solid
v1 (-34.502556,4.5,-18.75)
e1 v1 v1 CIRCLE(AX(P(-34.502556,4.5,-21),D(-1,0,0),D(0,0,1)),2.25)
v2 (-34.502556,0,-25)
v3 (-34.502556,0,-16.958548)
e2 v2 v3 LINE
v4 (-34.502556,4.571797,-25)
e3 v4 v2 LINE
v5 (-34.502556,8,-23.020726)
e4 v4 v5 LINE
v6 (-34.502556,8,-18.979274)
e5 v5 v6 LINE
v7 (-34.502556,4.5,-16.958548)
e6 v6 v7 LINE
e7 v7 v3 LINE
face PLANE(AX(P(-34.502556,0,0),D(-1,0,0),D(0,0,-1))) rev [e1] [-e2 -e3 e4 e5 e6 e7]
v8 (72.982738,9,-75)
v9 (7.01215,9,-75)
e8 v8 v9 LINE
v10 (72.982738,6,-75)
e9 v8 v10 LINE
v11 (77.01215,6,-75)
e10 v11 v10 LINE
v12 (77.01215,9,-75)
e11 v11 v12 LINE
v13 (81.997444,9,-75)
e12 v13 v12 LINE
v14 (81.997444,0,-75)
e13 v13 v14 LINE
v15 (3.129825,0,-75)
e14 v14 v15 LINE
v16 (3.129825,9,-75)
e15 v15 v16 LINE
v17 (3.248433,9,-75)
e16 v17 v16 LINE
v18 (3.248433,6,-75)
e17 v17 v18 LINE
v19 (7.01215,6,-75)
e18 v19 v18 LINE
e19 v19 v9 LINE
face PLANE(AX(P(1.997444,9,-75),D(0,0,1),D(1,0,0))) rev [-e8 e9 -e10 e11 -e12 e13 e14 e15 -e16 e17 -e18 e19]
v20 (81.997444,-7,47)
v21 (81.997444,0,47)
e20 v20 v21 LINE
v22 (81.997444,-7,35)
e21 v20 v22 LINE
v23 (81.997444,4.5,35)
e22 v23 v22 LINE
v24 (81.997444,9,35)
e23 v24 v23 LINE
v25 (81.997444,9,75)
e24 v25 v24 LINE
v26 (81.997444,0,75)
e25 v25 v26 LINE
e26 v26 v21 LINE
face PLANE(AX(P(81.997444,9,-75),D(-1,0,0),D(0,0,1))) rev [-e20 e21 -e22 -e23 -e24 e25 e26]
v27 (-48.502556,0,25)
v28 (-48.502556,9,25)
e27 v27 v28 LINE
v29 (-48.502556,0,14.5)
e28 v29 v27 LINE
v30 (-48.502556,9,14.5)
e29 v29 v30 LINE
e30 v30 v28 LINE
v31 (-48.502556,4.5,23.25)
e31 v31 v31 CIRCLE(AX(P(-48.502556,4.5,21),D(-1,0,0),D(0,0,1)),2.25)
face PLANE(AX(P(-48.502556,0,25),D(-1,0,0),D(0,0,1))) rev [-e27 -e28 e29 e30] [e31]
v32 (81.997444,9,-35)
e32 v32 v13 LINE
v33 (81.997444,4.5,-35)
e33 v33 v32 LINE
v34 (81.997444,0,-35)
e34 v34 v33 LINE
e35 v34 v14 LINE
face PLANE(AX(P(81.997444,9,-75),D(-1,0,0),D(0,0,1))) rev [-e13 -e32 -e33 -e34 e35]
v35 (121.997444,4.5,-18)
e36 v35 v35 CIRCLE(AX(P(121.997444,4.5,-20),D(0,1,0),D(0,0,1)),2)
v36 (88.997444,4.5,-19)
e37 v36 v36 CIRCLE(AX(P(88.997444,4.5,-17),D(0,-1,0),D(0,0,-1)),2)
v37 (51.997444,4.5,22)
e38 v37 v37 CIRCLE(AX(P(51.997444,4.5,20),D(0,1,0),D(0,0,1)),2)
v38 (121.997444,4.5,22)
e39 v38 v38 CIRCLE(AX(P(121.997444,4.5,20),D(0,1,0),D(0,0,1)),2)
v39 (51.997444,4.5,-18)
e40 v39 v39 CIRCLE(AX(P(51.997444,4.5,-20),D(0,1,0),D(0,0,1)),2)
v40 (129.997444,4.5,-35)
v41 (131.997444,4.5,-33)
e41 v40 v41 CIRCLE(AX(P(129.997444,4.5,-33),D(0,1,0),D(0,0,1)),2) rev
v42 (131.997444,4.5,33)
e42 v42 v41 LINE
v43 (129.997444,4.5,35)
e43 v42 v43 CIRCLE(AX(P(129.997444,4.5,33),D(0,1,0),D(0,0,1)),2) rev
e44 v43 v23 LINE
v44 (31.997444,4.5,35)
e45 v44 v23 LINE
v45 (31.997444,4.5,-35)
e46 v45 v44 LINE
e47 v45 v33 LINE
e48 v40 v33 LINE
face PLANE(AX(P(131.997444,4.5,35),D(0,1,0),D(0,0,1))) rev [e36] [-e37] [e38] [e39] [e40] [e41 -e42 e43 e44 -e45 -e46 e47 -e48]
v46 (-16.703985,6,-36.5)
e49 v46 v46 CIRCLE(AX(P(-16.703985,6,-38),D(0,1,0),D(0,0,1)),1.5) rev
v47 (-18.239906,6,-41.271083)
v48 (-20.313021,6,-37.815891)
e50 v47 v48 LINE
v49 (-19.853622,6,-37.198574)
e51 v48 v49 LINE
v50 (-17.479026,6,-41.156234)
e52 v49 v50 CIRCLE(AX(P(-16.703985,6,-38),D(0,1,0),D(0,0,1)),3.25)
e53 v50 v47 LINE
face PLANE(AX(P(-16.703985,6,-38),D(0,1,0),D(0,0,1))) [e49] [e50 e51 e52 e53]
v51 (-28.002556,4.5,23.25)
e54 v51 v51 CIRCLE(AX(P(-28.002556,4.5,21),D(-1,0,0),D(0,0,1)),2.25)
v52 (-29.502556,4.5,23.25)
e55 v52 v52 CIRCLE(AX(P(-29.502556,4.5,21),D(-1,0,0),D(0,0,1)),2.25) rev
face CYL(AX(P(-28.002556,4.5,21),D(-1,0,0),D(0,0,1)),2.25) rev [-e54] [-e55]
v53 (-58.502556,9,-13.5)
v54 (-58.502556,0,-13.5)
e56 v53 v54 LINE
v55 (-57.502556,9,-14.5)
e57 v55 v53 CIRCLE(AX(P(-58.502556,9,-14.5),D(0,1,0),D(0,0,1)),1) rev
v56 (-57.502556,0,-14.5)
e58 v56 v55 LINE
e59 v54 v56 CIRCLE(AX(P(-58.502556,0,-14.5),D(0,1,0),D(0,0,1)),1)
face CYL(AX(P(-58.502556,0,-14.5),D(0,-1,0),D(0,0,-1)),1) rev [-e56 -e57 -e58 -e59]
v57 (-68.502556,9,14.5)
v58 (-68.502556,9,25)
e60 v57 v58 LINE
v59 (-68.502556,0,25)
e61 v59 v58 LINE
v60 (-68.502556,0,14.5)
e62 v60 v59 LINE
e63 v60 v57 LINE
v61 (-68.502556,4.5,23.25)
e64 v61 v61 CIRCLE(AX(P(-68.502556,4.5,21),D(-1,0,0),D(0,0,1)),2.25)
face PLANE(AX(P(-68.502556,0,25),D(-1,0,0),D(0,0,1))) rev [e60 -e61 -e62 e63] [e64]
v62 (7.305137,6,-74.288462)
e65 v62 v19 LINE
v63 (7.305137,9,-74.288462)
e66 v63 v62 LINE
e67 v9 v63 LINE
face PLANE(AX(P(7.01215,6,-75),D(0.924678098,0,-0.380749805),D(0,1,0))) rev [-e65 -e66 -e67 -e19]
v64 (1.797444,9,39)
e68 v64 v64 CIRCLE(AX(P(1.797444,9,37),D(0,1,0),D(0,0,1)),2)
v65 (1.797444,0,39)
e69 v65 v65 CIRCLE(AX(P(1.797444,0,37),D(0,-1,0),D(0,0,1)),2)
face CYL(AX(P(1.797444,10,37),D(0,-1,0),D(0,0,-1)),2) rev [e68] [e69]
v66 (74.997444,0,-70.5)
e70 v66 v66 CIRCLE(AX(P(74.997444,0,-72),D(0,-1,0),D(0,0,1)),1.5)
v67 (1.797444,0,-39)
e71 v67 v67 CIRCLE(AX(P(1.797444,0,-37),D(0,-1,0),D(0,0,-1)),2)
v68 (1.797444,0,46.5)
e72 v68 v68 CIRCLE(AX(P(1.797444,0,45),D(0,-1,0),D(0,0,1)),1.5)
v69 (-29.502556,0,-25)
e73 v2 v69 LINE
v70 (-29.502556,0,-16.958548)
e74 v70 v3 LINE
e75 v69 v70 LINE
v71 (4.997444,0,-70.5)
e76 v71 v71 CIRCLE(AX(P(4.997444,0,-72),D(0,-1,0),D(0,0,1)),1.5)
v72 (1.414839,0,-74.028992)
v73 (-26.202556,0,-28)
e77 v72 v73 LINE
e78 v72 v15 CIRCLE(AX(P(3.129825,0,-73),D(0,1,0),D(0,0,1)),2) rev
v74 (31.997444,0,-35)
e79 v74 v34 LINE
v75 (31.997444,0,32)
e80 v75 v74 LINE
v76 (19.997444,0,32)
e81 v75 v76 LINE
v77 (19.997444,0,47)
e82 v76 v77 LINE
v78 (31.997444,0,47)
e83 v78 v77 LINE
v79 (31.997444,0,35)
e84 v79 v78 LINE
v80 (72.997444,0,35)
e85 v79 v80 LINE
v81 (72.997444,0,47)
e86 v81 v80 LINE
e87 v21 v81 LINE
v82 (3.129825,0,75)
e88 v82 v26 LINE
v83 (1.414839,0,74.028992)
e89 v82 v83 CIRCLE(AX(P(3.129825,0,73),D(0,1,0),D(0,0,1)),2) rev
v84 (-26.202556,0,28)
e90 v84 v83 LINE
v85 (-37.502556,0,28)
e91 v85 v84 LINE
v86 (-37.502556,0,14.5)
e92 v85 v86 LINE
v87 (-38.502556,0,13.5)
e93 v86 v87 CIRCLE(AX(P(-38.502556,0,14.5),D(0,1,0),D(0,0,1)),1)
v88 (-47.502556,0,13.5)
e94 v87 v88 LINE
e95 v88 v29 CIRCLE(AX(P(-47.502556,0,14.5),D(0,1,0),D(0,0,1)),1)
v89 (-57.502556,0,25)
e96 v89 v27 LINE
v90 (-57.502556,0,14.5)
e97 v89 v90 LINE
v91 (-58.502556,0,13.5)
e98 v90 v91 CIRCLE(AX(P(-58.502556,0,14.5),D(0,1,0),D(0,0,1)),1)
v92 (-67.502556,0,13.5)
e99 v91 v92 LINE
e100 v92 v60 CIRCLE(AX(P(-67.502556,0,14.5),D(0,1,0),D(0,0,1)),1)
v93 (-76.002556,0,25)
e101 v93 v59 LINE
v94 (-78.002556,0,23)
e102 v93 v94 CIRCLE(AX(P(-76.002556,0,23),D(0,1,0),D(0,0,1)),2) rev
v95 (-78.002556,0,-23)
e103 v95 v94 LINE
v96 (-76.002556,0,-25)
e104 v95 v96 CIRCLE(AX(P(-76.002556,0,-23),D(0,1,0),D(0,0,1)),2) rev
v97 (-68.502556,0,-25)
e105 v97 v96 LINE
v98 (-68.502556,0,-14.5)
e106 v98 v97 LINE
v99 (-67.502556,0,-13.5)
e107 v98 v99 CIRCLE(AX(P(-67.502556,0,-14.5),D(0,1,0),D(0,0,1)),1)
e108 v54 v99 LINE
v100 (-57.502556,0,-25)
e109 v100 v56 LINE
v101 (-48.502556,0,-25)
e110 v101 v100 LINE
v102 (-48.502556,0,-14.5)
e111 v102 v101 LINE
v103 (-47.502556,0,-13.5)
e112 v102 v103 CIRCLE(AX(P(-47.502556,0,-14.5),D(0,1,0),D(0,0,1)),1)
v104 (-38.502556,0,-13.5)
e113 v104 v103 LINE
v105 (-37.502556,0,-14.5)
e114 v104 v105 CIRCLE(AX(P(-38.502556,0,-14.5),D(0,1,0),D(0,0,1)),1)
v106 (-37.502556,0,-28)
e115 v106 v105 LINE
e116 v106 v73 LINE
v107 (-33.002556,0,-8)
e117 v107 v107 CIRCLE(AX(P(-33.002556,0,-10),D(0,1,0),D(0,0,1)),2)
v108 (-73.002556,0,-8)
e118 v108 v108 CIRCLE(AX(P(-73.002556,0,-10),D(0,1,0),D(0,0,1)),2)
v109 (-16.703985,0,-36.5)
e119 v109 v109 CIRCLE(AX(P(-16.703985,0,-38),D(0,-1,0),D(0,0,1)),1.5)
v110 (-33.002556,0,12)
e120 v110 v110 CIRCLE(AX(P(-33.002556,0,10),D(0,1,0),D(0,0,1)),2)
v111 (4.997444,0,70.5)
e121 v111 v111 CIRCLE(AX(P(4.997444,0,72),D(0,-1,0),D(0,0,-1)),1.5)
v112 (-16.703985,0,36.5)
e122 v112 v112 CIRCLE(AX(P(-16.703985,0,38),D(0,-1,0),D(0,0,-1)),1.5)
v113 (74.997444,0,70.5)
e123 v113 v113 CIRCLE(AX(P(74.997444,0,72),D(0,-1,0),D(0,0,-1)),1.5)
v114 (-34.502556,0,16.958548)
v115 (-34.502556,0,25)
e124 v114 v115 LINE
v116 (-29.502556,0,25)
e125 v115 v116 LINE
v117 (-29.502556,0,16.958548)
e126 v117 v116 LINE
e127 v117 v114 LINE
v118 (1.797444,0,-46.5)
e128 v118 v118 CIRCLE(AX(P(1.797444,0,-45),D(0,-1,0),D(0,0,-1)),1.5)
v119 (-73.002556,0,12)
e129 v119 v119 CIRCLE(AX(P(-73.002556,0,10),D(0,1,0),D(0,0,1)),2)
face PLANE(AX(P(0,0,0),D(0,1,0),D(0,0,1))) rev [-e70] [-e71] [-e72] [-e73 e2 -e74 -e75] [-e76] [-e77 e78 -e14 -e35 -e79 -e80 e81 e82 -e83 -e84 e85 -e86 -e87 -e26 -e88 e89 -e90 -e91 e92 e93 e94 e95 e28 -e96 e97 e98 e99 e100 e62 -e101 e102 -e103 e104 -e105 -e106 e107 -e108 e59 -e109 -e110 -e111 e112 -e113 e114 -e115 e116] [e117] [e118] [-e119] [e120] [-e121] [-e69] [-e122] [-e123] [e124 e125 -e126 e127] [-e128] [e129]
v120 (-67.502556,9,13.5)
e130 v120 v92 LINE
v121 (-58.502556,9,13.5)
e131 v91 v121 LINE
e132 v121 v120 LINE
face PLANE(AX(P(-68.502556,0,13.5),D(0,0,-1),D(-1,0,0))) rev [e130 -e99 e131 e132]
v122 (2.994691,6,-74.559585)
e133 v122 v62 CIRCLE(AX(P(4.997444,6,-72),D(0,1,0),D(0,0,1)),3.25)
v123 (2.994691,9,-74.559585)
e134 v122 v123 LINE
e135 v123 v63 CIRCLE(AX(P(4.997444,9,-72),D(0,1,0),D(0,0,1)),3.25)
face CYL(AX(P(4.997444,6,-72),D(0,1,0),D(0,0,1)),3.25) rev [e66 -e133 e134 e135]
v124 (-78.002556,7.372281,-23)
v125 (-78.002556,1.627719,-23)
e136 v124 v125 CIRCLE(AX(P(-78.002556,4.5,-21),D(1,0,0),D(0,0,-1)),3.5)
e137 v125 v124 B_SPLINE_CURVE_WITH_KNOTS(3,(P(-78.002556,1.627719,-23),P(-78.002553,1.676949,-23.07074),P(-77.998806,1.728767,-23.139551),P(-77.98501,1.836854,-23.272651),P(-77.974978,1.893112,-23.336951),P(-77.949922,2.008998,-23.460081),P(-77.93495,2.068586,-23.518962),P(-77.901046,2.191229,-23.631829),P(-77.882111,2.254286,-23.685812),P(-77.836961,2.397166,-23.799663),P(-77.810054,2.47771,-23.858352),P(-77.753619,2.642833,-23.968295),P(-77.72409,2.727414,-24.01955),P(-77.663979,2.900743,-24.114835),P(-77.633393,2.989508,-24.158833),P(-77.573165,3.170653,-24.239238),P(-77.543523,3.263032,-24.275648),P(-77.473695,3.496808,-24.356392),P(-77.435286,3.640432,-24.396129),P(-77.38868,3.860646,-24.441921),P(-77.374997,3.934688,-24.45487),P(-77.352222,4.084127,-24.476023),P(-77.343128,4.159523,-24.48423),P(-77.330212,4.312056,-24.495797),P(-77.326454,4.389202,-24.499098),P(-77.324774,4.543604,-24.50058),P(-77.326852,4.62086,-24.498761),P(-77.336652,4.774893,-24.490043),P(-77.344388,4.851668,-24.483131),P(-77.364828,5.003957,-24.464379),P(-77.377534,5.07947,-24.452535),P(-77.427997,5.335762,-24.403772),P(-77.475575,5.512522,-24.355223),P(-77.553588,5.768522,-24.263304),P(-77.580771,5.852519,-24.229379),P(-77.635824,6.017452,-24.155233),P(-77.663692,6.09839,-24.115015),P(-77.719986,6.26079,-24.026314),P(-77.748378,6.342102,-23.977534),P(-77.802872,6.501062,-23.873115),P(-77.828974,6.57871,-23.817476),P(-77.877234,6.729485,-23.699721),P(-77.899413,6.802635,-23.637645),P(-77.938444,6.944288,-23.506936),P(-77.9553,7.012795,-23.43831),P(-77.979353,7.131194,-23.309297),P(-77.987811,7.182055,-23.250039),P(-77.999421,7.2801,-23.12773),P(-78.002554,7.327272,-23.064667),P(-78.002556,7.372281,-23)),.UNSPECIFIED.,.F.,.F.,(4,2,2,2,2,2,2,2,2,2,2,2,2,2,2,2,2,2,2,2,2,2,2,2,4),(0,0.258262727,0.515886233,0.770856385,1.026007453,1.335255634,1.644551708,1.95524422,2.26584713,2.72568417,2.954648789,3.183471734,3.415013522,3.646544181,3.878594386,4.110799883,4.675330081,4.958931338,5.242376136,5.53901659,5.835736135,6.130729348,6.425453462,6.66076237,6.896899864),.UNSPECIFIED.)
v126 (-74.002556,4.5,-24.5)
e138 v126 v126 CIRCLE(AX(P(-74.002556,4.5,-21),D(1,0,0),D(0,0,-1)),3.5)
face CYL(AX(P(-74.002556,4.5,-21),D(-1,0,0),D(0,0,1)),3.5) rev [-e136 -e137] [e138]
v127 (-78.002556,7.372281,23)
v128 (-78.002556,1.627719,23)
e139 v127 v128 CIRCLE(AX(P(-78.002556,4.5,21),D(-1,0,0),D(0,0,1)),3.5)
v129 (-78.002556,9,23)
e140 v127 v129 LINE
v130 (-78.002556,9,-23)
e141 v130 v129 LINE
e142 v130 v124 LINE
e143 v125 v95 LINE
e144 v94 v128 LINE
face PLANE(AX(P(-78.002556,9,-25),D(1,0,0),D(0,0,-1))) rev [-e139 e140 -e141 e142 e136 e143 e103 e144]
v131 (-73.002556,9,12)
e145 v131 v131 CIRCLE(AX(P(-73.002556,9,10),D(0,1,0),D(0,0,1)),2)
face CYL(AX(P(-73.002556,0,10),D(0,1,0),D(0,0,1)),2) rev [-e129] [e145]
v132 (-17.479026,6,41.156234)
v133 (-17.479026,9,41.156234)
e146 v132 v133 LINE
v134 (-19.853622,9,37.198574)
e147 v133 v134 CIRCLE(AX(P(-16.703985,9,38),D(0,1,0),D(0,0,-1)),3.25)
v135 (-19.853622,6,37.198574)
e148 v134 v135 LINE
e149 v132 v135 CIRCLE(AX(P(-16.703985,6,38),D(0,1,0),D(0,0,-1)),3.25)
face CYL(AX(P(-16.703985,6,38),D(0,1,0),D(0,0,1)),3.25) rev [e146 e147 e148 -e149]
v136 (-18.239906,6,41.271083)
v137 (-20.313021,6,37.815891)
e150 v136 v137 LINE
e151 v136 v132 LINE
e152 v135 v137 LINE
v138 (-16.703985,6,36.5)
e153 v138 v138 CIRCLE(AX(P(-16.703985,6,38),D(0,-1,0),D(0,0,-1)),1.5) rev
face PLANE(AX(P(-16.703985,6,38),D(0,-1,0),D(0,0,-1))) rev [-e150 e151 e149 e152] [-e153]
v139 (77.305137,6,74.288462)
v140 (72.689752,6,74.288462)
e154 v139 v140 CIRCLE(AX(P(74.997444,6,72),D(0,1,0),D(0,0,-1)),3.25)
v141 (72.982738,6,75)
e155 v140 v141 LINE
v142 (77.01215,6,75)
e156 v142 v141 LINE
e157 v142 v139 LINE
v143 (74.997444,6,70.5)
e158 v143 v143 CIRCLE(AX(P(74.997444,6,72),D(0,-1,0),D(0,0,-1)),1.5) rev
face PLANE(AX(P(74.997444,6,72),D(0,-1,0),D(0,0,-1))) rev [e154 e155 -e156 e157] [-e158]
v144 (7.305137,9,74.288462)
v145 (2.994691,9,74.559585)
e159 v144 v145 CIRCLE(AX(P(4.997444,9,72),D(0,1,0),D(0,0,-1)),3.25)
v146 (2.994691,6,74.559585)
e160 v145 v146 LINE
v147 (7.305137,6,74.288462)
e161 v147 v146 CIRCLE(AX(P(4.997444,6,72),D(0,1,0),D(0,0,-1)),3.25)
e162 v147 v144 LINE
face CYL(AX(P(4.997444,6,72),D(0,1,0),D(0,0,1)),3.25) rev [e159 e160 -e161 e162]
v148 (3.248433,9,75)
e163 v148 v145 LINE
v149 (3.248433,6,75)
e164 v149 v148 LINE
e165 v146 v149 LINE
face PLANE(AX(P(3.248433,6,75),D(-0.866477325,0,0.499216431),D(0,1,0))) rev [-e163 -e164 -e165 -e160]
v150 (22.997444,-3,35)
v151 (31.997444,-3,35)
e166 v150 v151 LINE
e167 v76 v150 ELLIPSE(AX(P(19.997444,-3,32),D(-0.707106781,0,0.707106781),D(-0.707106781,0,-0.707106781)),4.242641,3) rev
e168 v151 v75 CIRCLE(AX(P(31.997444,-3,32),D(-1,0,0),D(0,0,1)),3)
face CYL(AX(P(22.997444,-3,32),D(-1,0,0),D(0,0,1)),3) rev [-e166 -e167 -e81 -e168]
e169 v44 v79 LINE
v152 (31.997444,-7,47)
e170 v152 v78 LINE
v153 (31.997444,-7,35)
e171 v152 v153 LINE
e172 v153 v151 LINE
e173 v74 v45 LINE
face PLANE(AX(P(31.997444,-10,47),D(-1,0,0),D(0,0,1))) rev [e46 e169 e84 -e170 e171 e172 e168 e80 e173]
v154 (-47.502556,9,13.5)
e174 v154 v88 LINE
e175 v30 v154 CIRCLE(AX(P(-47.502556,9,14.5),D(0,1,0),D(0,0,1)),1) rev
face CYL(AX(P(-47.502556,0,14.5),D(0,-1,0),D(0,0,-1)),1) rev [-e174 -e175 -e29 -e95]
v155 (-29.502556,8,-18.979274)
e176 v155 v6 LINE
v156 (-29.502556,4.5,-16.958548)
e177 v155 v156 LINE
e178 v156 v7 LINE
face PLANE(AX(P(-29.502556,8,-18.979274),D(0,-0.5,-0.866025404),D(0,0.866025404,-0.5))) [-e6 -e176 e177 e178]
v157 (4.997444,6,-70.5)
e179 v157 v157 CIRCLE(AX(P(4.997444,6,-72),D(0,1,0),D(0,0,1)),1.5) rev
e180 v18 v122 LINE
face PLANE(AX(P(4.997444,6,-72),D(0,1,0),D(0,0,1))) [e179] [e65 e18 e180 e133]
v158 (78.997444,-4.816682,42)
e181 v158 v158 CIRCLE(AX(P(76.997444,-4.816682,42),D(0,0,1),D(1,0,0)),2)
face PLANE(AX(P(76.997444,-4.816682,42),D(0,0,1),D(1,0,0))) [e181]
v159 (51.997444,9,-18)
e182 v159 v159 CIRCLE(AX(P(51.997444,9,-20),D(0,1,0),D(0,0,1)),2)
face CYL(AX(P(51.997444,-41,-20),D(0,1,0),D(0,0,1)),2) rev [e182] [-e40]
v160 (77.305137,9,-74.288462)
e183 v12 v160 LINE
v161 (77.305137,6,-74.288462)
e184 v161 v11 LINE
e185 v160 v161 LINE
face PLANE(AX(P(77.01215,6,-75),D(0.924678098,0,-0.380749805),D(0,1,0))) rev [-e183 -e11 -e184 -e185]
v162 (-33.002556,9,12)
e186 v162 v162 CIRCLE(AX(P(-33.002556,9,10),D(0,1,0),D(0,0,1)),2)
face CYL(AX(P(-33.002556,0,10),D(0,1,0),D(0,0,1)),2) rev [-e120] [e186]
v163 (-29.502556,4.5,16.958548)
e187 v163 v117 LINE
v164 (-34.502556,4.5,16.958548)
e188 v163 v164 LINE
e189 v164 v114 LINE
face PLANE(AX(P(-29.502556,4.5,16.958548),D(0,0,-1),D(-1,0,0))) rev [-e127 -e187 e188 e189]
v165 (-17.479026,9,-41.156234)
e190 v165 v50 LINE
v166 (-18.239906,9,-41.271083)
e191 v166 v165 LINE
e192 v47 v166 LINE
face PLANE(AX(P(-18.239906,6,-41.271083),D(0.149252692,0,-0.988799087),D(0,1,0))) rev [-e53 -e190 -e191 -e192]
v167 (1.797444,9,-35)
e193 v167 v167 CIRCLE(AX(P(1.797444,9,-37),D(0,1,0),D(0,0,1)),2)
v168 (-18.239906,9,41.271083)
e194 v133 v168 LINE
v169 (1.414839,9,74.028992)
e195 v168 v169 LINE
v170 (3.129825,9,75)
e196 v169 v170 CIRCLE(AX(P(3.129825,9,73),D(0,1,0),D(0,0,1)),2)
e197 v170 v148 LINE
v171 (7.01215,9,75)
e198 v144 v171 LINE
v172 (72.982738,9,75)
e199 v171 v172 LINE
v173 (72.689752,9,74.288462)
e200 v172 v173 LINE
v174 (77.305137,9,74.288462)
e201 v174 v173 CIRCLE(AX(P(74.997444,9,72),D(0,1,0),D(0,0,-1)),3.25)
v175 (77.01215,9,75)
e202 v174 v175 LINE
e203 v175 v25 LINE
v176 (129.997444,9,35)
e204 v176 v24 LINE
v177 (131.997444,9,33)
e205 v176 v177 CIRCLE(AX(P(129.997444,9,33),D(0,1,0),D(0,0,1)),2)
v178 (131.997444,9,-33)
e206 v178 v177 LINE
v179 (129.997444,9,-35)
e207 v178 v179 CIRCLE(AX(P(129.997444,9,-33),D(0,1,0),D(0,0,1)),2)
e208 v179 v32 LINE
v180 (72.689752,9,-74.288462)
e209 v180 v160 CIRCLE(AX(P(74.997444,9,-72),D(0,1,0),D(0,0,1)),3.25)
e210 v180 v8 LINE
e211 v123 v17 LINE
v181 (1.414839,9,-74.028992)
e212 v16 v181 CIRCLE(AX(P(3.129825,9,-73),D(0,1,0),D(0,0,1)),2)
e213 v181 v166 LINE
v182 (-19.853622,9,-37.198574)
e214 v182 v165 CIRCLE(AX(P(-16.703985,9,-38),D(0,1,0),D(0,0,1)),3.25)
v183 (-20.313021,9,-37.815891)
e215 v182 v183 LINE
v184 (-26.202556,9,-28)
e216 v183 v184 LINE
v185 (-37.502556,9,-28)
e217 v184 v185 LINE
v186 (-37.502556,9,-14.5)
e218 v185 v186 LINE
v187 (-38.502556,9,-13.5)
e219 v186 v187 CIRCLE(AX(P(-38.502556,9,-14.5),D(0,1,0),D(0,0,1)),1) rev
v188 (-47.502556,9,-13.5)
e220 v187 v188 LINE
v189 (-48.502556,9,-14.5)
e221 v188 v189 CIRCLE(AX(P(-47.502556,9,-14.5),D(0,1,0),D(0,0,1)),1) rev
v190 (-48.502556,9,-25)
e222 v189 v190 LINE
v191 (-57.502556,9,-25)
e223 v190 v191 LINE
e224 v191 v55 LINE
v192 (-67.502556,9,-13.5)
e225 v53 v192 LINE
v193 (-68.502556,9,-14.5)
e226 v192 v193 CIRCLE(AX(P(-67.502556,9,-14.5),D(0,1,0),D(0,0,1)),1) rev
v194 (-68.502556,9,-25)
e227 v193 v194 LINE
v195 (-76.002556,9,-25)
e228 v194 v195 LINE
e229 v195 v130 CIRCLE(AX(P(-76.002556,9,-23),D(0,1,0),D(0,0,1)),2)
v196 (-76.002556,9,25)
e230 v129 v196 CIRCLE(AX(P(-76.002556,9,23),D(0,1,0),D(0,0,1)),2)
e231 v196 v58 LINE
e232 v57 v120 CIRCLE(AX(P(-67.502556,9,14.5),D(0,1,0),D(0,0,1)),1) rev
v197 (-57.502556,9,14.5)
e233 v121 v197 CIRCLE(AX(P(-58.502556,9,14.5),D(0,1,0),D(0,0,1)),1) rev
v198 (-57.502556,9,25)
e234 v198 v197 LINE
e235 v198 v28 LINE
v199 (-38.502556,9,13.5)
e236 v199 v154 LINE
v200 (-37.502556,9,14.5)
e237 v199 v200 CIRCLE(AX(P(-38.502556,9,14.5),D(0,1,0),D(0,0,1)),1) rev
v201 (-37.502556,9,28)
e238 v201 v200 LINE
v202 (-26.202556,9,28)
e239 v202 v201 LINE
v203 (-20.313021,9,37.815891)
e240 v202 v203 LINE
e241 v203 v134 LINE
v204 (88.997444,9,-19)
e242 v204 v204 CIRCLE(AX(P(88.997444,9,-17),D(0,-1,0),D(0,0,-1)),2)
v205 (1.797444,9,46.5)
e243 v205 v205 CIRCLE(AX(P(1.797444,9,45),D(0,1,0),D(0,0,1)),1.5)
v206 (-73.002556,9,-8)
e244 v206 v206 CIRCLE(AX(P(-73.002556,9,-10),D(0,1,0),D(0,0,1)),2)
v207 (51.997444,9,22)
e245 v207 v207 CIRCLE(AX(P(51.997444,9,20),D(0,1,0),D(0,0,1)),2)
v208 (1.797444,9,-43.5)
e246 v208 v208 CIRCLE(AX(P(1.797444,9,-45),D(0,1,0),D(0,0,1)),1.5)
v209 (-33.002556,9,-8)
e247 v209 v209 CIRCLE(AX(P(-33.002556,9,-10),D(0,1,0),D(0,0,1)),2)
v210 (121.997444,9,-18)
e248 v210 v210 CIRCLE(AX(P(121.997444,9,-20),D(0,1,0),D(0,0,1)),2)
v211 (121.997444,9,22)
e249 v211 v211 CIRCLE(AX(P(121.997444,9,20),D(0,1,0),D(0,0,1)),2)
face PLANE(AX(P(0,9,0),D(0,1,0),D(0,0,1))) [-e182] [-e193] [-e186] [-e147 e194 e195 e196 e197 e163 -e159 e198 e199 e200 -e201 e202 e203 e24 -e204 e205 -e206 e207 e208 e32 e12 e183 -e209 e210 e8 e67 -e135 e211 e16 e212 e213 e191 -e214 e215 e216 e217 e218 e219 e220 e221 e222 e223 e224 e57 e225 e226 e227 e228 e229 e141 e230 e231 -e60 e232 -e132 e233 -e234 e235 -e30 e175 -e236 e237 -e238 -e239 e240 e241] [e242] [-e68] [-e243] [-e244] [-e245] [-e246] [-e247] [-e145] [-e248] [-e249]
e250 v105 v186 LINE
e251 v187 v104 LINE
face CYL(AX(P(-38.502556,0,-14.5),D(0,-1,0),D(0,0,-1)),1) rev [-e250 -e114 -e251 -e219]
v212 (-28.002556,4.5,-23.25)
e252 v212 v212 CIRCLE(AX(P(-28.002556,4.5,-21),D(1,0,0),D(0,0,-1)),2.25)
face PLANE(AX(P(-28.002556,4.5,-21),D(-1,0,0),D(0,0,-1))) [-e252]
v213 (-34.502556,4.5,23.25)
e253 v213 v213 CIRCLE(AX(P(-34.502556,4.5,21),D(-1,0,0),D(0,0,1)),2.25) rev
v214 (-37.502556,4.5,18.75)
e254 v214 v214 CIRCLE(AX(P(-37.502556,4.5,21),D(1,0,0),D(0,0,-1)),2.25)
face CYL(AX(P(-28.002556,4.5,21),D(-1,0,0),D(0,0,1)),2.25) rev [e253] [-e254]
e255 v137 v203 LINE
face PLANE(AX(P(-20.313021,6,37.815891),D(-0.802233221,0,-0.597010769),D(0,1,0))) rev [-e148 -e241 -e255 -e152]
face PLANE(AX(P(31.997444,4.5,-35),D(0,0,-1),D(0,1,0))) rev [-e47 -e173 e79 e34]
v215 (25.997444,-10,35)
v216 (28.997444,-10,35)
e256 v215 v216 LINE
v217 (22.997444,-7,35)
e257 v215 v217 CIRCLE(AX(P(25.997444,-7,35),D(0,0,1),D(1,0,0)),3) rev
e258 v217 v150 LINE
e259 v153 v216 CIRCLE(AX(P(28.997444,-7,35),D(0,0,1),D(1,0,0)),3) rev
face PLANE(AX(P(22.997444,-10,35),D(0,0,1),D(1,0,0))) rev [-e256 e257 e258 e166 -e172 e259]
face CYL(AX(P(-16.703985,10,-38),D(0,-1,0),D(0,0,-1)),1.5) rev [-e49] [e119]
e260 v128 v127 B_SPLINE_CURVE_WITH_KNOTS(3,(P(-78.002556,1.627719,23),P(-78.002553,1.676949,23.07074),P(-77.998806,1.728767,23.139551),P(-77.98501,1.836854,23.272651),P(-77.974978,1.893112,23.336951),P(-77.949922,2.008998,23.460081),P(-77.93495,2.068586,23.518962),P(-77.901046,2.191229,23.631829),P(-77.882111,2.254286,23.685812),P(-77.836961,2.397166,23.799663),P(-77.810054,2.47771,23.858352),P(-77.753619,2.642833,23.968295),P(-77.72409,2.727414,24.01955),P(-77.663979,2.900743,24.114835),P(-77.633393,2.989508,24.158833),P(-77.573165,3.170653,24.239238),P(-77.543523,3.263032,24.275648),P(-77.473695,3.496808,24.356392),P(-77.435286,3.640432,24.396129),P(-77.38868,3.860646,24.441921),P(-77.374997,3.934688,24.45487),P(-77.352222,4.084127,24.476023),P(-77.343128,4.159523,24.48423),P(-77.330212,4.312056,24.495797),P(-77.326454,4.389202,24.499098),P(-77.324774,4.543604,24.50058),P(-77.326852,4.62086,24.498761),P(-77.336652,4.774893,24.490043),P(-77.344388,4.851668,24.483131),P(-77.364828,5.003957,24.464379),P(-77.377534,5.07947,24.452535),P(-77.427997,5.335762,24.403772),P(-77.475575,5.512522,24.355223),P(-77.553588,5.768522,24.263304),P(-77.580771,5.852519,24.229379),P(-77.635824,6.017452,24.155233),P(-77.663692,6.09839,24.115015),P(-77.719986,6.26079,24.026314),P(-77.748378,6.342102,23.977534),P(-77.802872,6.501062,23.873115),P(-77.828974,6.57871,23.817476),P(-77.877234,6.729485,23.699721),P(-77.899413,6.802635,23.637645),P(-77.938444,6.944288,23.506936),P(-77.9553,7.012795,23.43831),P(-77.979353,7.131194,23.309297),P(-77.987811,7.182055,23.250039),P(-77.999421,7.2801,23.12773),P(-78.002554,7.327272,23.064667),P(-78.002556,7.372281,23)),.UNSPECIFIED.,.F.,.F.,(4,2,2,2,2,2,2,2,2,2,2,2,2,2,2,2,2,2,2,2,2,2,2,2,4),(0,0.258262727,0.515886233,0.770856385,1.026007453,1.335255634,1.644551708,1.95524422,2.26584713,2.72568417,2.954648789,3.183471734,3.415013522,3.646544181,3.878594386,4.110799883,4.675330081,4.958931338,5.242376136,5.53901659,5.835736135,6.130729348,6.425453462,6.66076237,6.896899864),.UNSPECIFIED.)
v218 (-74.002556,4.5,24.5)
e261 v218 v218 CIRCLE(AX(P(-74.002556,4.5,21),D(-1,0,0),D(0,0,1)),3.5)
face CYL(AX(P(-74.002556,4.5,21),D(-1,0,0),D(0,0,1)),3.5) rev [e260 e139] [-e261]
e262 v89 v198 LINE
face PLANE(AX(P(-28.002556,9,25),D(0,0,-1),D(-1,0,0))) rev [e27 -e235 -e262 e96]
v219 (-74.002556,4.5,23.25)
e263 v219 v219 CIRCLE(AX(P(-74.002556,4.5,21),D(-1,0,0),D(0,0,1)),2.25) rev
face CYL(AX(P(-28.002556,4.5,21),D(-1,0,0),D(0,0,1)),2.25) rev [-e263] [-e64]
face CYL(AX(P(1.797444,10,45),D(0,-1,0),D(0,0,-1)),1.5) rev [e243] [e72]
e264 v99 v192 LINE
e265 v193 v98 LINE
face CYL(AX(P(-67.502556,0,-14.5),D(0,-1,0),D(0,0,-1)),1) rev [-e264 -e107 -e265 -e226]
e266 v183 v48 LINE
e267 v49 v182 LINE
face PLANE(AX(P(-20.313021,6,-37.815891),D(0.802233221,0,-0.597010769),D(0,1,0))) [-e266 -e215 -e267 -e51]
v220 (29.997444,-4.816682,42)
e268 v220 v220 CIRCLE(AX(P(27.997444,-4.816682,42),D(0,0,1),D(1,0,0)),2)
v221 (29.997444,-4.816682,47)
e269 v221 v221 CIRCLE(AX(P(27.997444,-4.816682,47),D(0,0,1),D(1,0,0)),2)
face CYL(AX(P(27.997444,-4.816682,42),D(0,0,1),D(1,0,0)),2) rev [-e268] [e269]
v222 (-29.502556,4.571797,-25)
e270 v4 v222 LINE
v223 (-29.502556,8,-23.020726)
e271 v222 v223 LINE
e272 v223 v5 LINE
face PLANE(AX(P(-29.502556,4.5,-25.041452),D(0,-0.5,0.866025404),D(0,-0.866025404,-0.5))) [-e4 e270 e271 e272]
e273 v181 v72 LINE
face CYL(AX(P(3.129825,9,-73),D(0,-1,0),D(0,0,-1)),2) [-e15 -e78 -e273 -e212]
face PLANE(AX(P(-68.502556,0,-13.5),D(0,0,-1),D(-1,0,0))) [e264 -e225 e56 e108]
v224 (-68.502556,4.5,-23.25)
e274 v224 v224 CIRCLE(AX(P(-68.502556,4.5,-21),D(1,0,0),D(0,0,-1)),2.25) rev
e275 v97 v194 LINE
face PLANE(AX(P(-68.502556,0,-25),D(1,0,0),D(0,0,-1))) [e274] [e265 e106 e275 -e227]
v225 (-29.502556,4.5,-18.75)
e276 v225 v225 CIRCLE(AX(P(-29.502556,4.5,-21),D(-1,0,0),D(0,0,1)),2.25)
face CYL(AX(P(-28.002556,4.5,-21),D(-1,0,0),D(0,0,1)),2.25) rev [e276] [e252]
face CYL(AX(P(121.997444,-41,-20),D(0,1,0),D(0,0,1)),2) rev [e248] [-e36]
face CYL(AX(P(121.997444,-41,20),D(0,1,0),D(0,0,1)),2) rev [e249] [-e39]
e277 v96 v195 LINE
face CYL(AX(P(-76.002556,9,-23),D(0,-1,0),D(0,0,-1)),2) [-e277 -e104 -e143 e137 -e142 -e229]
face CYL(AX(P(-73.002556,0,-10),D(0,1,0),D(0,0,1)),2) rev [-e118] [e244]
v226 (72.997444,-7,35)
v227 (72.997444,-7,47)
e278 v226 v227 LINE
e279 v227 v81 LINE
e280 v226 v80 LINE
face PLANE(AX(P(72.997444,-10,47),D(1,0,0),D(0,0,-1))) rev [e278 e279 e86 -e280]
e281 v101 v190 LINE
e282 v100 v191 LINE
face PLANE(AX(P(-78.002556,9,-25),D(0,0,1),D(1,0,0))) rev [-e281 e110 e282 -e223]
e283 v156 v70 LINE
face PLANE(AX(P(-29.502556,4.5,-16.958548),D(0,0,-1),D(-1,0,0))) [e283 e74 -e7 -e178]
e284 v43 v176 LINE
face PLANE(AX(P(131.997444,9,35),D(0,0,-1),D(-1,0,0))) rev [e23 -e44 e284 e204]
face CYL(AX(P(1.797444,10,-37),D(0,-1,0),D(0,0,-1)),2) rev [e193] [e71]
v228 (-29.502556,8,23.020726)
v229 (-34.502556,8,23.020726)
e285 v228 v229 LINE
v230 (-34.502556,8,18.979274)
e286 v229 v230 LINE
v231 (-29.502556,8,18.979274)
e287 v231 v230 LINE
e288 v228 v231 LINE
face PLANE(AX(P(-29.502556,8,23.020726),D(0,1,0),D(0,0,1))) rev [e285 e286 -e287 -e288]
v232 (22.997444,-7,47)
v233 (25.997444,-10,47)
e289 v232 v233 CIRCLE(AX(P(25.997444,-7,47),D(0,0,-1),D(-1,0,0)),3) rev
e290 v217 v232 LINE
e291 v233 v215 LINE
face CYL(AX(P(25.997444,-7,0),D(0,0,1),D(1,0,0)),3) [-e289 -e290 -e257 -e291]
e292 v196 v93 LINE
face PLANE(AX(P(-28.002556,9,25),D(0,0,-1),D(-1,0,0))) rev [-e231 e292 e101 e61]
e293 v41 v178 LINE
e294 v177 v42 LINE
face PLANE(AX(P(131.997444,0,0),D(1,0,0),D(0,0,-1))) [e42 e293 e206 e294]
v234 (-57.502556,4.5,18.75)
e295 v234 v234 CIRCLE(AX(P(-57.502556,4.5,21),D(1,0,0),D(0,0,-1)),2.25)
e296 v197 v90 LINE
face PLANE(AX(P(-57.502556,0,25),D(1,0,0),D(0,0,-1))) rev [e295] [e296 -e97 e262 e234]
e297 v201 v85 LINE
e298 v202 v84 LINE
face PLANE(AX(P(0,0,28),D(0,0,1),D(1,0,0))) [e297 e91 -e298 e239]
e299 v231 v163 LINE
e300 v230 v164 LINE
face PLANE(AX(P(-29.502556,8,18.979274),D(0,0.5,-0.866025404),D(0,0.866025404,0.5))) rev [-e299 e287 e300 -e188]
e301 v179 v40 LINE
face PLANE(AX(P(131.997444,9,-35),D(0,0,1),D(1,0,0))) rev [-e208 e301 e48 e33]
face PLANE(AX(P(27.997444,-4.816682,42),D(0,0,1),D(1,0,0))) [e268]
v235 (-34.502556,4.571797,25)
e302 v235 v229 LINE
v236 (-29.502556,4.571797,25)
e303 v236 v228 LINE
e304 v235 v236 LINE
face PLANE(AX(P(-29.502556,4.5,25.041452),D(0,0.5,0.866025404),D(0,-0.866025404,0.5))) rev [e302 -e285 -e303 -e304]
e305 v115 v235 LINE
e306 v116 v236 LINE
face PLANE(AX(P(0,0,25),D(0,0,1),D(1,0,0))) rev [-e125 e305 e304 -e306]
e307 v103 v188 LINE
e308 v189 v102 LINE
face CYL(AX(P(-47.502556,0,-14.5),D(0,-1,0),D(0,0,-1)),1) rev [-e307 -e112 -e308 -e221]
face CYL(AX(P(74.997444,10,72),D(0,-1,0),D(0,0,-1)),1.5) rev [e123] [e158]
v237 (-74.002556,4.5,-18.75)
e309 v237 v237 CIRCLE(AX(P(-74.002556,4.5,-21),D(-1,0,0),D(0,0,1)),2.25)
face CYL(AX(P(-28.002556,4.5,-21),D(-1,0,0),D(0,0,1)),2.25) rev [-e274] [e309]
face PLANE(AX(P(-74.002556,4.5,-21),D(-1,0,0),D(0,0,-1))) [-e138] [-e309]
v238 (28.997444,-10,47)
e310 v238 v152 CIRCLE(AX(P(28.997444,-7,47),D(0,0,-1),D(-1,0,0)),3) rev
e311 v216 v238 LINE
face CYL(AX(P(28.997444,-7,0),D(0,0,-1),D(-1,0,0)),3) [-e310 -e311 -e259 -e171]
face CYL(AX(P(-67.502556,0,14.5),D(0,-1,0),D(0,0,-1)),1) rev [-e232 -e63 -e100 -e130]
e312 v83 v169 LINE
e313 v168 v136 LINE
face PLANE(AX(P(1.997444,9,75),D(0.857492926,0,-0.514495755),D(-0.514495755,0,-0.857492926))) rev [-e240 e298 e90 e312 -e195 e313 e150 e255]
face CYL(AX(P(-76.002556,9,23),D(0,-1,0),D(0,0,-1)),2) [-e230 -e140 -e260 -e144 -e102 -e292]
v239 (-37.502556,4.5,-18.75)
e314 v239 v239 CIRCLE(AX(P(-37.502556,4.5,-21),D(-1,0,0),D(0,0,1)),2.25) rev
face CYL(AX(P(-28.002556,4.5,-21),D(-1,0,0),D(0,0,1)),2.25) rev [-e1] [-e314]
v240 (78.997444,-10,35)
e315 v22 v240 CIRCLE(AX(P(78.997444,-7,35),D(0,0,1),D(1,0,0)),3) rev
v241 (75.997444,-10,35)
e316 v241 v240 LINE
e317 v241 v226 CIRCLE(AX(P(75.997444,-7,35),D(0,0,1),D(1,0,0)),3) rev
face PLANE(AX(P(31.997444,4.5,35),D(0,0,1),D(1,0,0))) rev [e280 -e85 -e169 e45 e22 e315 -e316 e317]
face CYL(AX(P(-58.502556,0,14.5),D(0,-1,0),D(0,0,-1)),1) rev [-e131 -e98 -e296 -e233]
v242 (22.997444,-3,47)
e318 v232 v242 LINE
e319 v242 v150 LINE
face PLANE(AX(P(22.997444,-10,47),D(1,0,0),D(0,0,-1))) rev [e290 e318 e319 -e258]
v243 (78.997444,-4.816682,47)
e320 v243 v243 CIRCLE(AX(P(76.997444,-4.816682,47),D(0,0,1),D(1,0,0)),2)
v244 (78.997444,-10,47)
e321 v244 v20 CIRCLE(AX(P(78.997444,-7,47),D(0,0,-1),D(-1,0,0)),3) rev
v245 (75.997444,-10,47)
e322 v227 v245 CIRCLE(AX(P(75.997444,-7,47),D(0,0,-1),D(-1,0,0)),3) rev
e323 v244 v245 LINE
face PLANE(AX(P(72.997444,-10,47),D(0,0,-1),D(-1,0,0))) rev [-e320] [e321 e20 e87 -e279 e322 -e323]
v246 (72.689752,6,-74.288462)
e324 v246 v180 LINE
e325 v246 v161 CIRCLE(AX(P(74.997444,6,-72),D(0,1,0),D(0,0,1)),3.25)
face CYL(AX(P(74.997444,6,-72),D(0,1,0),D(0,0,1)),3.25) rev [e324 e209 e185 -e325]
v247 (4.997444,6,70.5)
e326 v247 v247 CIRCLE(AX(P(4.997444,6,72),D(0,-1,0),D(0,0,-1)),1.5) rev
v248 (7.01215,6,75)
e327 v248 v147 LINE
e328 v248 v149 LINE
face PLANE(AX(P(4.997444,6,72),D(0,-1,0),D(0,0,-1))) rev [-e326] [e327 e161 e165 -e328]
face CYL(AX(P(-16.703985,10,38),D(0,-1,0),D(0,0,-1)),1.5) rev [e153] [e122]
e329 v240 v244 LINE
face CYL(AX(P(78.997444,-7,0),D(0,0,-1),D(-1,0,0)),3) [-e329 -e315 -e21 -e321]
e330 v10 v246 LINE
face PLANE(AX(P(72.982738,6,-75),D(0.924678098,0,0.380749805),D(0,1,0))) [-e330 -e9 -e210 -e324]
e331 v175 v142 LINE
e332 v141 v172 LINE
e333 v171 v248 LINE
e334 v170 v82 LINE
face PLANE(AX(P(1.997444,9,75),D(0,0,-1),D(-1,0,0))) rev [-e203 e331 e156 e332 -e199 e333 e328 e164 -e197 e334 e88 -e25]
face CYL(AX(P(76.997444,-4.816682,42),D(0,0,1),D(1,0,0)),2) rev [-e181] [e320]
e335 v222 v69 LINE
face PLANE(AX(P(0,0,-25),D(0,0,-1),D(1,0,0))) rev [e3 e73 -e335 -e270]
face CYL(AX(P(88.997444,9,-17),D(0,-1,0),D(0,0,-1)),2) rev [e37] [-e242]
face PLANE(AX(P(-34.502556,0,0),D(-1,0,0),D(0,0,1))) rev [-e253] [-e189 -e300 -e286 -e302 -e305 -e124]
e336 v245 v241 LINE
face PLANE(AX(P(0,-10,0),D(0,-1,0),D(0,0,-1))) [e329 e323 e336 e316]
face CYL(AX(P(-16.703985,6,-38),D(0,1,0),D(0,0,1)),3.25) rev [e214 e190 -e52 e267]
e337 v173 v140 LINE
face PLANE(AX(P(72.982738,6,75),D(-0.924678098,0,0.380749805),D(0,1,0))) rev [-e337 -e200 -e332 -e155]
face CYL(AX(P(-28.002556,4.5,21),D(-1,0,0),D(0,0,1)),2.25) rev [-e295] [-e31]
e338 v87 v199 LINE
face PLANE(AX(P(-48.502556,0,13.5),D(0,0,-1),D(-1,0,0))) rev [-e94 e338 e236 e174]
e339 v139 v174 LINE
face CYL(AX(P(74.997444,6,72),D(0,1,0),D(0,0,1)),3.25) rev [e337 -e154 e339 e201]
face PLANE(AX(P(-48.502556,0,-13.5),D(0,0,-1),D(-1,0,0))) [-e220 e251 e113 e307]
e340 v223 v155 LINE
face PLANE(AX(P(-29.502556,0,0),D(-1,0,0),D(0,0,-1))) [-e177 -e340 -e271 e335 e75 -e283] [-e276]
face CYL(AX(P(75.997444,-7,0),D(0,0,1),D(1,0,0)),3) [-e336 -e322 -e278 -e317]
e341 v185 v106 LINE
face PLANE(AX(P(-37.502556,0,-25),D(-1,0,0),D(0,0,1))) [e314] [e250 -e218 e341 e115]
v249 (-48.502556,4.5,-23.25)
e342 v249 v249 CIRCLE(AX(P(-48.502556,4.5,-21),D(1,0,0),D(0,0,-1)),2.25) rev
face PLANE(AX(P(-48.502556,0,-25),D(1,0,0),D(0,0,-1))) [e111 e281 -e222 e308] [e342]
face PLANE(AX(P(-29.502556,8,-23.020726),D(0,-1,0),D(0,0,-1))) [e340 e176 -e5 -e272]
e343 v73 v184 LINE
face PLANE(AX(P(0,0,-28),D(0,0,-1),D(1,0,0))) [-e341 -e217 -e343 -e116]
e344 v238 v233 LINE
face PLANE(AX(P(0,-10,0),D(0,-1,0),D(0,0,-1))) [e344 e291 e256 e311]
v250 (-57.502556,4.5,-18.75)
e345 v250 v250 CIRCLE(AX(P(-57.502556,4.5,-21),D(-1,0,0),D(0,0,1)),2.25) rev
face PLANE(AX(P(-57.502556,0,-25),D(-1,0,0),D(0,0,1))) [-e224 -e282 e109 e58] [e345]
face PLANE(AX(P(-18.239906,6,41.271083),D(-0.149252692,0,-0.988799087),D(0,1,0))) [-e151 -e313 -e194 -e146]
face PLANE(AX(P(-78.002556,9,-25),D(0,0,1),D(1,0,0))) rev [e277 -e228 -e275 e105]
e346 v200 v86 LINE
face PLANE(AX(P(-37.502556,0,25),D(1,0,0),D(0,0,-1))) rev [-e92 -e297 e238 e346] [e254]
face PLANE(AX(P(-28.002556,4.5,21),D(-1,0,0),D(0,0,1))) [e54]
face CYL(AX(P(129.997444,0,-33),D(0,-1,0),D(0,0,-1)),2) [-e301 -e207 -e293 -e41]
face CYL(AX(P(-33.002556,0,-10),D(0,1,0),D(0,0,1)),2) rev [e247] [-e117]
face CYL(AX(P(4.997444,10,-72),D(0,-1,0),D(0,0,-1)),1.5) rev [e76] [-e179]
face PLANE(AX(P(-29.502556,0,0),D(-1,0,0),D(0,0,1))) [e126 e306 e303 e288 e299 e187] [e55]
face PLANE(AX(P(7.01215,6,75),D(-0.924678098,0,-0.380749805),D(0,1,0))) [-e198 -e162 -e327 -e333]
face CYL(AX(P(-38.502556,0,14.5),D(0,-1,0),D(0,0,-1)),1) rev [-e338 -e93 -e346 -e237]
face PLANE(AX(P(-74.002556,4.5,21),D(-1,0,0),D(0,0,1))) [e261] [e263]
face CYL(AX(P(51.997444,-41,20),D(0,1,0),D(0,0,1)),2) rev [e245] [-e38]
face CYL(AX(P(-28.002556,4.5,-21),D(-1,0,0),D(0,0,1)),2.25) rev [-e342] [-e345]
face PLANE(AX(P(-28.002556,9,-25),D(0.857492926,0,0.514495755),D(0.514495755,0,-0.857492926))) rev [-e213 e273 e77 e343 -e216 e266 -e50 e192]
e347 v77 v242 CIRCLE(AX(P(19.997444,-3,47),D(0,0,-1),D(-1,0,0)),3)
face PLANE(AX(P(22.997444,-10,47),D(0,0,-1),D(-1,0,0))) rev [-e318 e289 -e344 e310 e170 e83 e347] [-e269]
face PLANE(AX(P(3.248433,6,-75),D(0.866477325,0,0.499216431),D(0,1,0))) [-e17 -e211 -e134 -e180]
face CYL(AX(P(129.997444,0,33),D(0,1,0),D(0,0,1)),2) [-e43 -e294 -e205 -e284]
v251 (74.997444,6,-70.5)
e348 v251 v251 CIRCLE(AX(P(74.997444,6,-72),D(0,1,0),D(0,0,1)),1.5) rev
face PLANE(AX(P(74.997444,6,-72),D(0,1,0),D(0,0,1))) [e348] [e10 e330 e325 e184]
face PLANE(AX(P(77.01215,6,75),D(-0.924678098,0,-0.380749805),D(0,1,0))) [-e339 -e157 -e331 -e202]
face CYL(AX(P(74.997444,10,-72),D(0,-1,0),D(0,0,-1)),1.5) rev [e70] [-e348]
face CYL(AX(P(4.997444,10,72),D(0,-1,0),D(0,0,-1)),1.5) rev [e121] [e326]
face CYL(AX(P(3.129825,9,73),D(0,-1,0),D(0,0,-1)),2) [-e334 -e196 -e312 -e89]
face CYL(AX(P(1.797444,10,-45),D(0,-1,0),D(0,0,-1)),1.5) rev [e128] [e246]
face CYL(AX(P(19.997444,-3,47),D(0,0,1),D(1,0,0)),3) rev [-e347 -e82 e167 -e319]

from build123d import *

# Parameters (mm, degrees)
BOSS_EXTRUDE1_DEPTH = 9
SKETCH3_R           = 2
CUT_EXTRUDE1_DEPTH  = 112.488030158
SKETCH4_W           = 70
SKETCH4_H           = 4.5
BOSS_EXTRUDE2_DEPTH = 50
SKETCH5_W           = 70
SKETCH5_H           = 4.5
CUT_EXTRUDE2_DEPTH  = 50
SKETCH6_R           = 2
CUT_EXTRUDE4_DEPTH  = 50
FILLET1_R           = 2
FILLET2_R           = 2
SKETCH7_W           = 11
SKETCH7_H           = 11.5
CUT_EXTRUDE5_DEPTH  = 153.08328408
SKETCH8_R           = 2.25
CUT_EXTRUDE6_DEPTH  = 50
SKETCH10_R          = 3.5
CUT_EXTRUDE8_DEPTH  = 4
CUT_EXTRUDE9_START  = -3
CUT_EXTRUDE9_DEPTH  = 5
FILLET6_R           = 1
SKETCH12_R          = 1.5
CUT_EXTRUDE10_DEPTH = 10
SKETCH13_R          = 3.25
CUT_EXTRUDE11_DEPTH = 3
CHAMFER1_START      = 6
CHAMFER1_DEPTH      = 4
SKETCH14_W          = 12
SKETCH14_H          = 9
BOSS_EXTRUDE3_DEPTH = 3
SKETCH15_R          = 2
CUT_EXTRUDE12_DEPTH = 152.883426671
SKETCH16_R          = 2
SKETCH16_R_2        = 1.5
CUT_EXTRUDE13_DEPTH = 10
SKETCH17_W          = 9
SKETCH17_H          = 12
BOSS_EXTRUDE4_DEPTH = 10
SKETCH18_R          = 2
CUT_EXTRUDE14_DEPTH = 5
FILLET8_R           = 3


with BuildPart() as part:
    # Sketch1 → Boss-Extrude1 (new body)
    with BuildSketch(Plane(origin=(0, 0, 0), x_dir=(1, 0, 0), z_dir=(0, 1, 0))):
        Polygon((-78.00255572, 25), (-28.00255572, 25), (1.99744428, 75), (81.99744428, 75), (81.99744428, -75), (1.99744428, -75), (-28.00255572, -25), (-78.00255572, -25), align=None)
    extrude(amount=BOSS_EXTRUDE1_DEPTH)

    # Sketch3 → Cut-Extrude1 (cut, through all)
    with BuildSketch(Plane(origin=(0, 9, 0), x_dir=(1, 0, 0), z_dir=(0, 1, 0))):
        with Locations(Location((-73.00255572, 10, 0), (0, 0, 270))):
            Circle(SKETCH3_R)
        with Locations(Location((-33.00255572, 10, 0), (0, 0, 270))):
            Circle(SKETCH3_R)
        with Locations(Location((-33.00255572, -10, 0), (0, 0, 270))):
            Circle(SKETCH3_R)
        with Locations(Location((-73.00255572, -10, 0), (0, 0, 270))):
            Circle(SKETCH3_R)
    extrude(amount=-CUT_EXTRUDE1_DEPTH, mode=Mode.SUBTRACT)

    # Sketch4 → Boss-Extrude2 (add)
    with BuildSketch(Plane(origin=(81.99744428, 0, 0), x_dir=(0, 0, -1), z_dir=(1, 0, 0))):
        with Locations((0, 6.75)):
            Rectangle(SKETCH4_W, SKETCH4_H)
    extrude(amount=BOSS_EXTRUDE2_DEPTH)

    # Sketch5 → Cut-Extrude2 (cut)
    with BuildSketch(Plane(origin=(81.99744428, 0, 0), x_dir=(0, 0, -1), z_dir=(1, 0, 0))):
        with Locations((0, 2.25)):
            Rectangle(SKETCH5_W, SKETCH5_H)
    extrude(amount=-CUT_EXTRUDE2_DEPTH, mode=Mode.SUBTRACT)

    # Sketch6 → Cut-Extrude4 (cut)
    with BuildSketch(Plane(origin=(0, 9, 0), x_dir=(1, 0, 0), z_dir=(0, 1, 0))):
        with Locations(Location((51.99744428, 20, 0), (0, 0, 270))):
            Circle(SKETCH6_R)
        with Locations(Location((51.99744428, -20, 0), (0, 0, 270))):
            Circle(SKETCH6_R)
        with Locations(Location((121.99744428, 20, 0), (0, 0, 270))):
            Circle(SKETCH6_R)
        with Locations(Location((121.99744428, -20, 0), (0, 0, 270))):
            Circle(SKETCH6_R)
    extrude(amount=-CUT_EXTRUDE4_DEPTH, mode=Mode.SUBTRACT)

    # Fillet1
    fillet1_edges = [part.edges().sort_by_distance(p)[0] for p in [
        (1.99744428, 4.5, 75),
        (-28.00255572, 4.5, 25),
        (-78.00255572, 4.5, 25),
        (-78.00255572, 4.5, -25),
        (-28.00255572, 4.5, -25),
        (1.99744428, 4.5, -75),
    ]]
    fillet(fillet1_edges, radius=FILLET1_R)

    # Fillet2
    fillet2_edges = [part.edges().sort_by_distance(p)[0] for p in [
        (131.99744428, 6.75, 35),
        (131.99744428, 6.75, -35),
    ]]
    fillet(fillet2_edges, radius=FILLET2_R)

    # Sketch7 → Cut-Extrude5 (cut, through all)
    with BuildSketch(Plane(origin=(0, 9, 0), x_dir=(1, 0, 0), z_dir=(0, 1, 0))):
        with Locations((-63.00255572, -19.25)):
            Rectangle(SKETCH7_W, SKETCH7_H)
        with Locations((-43.00255572, -19.25)):
            Rectangle(SKETCH7_W, SKETCH7_H)
    cut_extrude5 = extrude(amount=-CUT_EXTRUDE5_DEPTH, mode=Mode.SUBTRACT)

    # Sketch8 → Cut-Extrude6 (cut)
    with BuildSketch(Plane.ZY.offset(78.00255572)):
        with Locations((21, 4.5)):
            Circle(SKETCH8_R)
    cut_extrude6 = extrude(amount=-CUT_EXTRUDE6_DEPTH, mode=Mode.SUBTRACT)

    # Sketch10 → Cut-Extrude8 (cut)
    with BuildSketch(Plane.ZY.offset(78.00255572)):
        with Locations((21, 4.5)):
            Circle(SKETCH10_R)
    cut_extrude8 = extrude(amount=-CUT_EXTRUDE8_DEPTH, mode=Mode.SUBTRACT)

    # Sketch11 → Cut-Extrude9 (cut)
    with BuildSketch(Plane.ZY.offset(37.50255572).offset(CUT_EXTRUDE9_START)):
        Polygon((16.958548116, 4.5), (16.958548116, -3.067772958), (25.041451884, -3.067772958), (25.041451884, 4.5), (23.020725942, 8), (18.979274058, 8), align=None)
    cut_extrude9 = extrude(amount=-CUT_EXTRUDE9_DEPTH, mode=Mode.SUBTRACT)

    # Mirror8: Cut-Extrude5, Cut-Extrude6, Cut-Extrude8, Cut-Extrude9 across plane
    add(cut_extrude5.mirror(Plane.XY), mode=Mode.SUBTRACT)
    add(cut_extrude6.mirror(Plane.XY), mode=Mode.SUBTRACT)
    add(cut_extrude8.mirror(Plane.XY), mode=Mode.SUBTRACT)
    add(cut_extrude9.mirror(Plane.XY), mode=Mode.SUBTRACT)

    # Fillet6
    fillet6_edges = [part.edges().sort_by_distance(p)[0] for p in [
        (-68.50255572, 4.5, 13.5),
        (-57.50255572, 4.5, 13.5),
        (-48.50255572, 4.5, 13.5),
        (-37.50255572, 4.5, 13.5),
        (-68.50255572, 4.5, -13.5),
        (-57.50255572, 4.5, -13.5),
        (-48.50255572, 4.5, -13.5),
        (-37.50255572, 4.5, -13.5),
    ]]
    fillet(fillet6_edges, radius=FILLET6_R)

    # Sketch12 → Cut-Extrude10 (cut)
    with BuildSketch(Plane.XZ):
        with Locations(Location((4.99744428, 72, 0), (0, 0, 270))):
            Circle(SKETCH12_R)
        with Locations(Location((74.99744428, 72, 0), (0, 0, 270))):
            Circle(SKETCH12_R)
        with Locations(Location((-16.703984583, 38, 0), (0, 0, 270))):
            Circle(SKETCH12_R)
        with Locations(Location((-16.703984583, -38, 0), (0, 0, 90))):
            Circle(SKETCH12_R)
        with Locations(Location((74.99744428, -72, 0), (0, 0, 90))):
            Circle(SKETCH12_R)
        with Locations(Location((4.99744428, -72, 0), (0, 0, 90))):
            Circle(SKETCH12_R)
    extrude(amount=-CUT_EXTRUDE10_DEPTH, mode=Mode.SUBTRACT)

    # Sketch13 → Cut-Extrude11 (cut)
    with BuildSketch(Plane(origin=(0, 9, 0), x_dir=(1, 0, 0), z_dir=(0, 1, 0))):
        with Locations((-16.703984583, 38)):
            Circle(SKETCH13_R)
        with Locations((4.99744428, 72)):
            Circle(SKETCH13_R)
        with Locations((74.99744428, 72)):
            Circle(SKETCH13_R)
        with Locations((74.99744428, -72)):
            Circle(SKETCH13_R)
        with Locations((4.99744428, -72)):
            Circle(SKETCH13_R)
        with Locations((-16.703984583, -38)):
            Circle(SKETCH13_R)
    extrude(amount=-CUT_EXTRUDE11_DEPTH, mode=Mode.SUBTRACT)

    # Chamfer1: read off the stored shape, not the designer's step
    # Chamfer1 outline → Chamfer1 (cut)
    with BuildSketch(Plane(origin=(0, 0, 0), x_dir=(1, 0, 0), z_dir=(0, 1, 0)).offset(CHAMFER1_START)):
        with BuildLine():
            ThreePointArc((76.24744428, 75), (76.81151853, 74.696596858), (77.305136588, 74.288461538))
            Line((77.305136588, 74.288461538), (77.012150163, 75))
            Line((77.012150163, 75), (76.24744428, 75))
        make_face()
        with BuildLine():
            Line((7.305136588, 74.288461538), (7.012150163, 75))
            Line((7.012150163, 75), (6.24744428, 75))
            ThreePointArc((6.24744428, 75), (6.81151853, 74.696596858), (7.305136588, 74.288461538))
        make_face()
        with BuildLine():
            Line((72.982738398, 75), (72.689751972, 74.288461538))
            ThreePointArc((72.689751972, 74.288461538), (73.18337003, 74.696596858), (73.74744428, 75))
            Line((73.74744428, 75), (72.982738398, 75))
        make_face()
        with BuildLine():
            Line((3.24843319, 75), (2.994690649, 74.559585492))
            ThreePointArc((2.994690649, 74.559585492), (3.35622742, 74.805157254), (3.74744428, 75))
            Line((3.74744428, 75), (3.24843319, 75))
        make_face()
        with BuildLine():
            Line((-20.313020985, 37.815891225), (-19.85362206, 37.198573919))
            ThreePointArc((-19.85362206, 37.198573919), (-19.949630814, 37.831831801), (-19.919583054, 38.471621109))
            Line((-19.919583054, 38.471621109), (-20.313020985, 37.815891225))
        make_face()
        with BuildLine():
            ThreePointArc((-18.633343666, 40.615353423), (-18.082963811, 40.942943473), (-17.479026266, 41.156233576))
            Line((-17.479026266, 41.156233576), (-18.239905735, 41.271083308))
            Line((-18.239905735, 41.271083308), (-18.633343666, 40.615353423))
        make_face()
        with BuildLine():
            Line((6.24744428, -75), (7.012150163, -75))
            Line((7.012150163, -75), (7.305136588, -74.288461538))
            ThreePointArc((7.305136588, -74.288461538), (6.81151853, -74.696596858), (6.24744428, -75))
        make_face()
        with BuildLine():
            Line((77.012150163, -75), (77.305136588, -74.288461538))
            ThreePointArc((77.305136588, -74.288461538), (76.81151853, -74.696596858), (76.24744428, -75))
            Line((76.24744428, -75), (77.012150163, -75))
        make_face()
        with BuildLine():
            ThreePointArc((73.74744428, -75), (73.18337003, -74.696596858), (72.689751972, -74.288461538))
            Line((72.689751972, -74.288461538), (72.982738398, -75))
            Line((72.982738398, -75), (73.74744428, -75))
        make_face()
        with BuildLine():
            ThreePointArc((3.74744428, -75), (3.35622742, -74.805157254), (2.994690649, -74.559585492))
            Line((2.994690649, -74.559585492), (3.24843319, -75))
            Line((3.24843319, -75), (3.74744428, -75))
        make_face()
        with BuildLine():
            Line((-18.239905735, -41.271083308), (-17.479026266, -41.156233576))
            ThreePointArc((-17.479026266, -41.156233576), (-18.082963811, -40.942943473), (-18.633343666, -40.615353423))
            Line((-18.633343666, -40.615353423), (-18.239905735, -41.271083308))
        make_face()
        with BuildLine():
            ThreePointArc((-19.919583054, -38.471621109), (-19.949630814, -37.831831801), (-19.85362206, -37.198573919))
            Line((-19.85362206, -37.198573919), (-20.313020985, -37.815891225))
            Line((-20.313020985, -37.815891225), (-19.919583054, -38.471621109))
        make_face()
    extrude(amount=CHAMFER1_DEPTH, mode=Mode.SUBTRACT)

    # Sketch14 → Boss-Extrude3 (add)
    with BuildSketch(Plane.XY.offset(25)):
        with Locations((-31.50255572, 4.5)):
            Rectangle(SKETCH14_W, SKETCH14_H)
    boss_extrude3 = extrude(amount=BOSS_EXTRUDE3_DEPTH)

    # Mirror10: Boss-Extrude3 across plane
    add(boss_extrude3.mirror(Plane.XY))

    # Sketch15 → Cut-Extrude12 (cut, through all)
    with BuildSketch(Plane.XZ.offset(-4.5)):
        with Locations(Location((88.99744428, -17, 0), (0, 0, 270))):
            Circle(SKETCH15_R)
    extrude(amount=-CUT_EXTRUDE12_DEPTH, mode=Mode.SUBTRACT)

    # Sketch16 → Cut-Extrude13 (cut)
    with BuildSketch(Plane.XZ):
        with Locations(Location((1.79744428, -37, 0), (0, 0, 270))):
            Circle(SKETCH16_R)
        with Locations(Location((1.79744428, -45, 0), (0, 0, 270))):
            Circle(SKETCH16_R_2)
        with Locations(Location((1.79744428, 45, 0), (0, 0, 90))):
            Circle(SKETCH16_R_2)
        with Locations(Location((1.79744428, 37, 0), (0, 0, 90))):
            Circle(SKETCH16_R)
    extrude(amount=-CUT_EXTRUDE13_DEPTH, mode=Mode.SUBTRACT)

    # Sketch17 → Boss-Extrude4 (add)
    with BuildSketch(Plane.XZ):
        with Locations((27.49744428, 41)):
            Rectangle(SKETCH17_W, SKETCH17_H)
        with Locations((77.49744428, 41)):
            Rectangle(SKETCH17_W, SKETCH17_H)
    extrude(amount=BOSS_EXTRUDE4_DEPTH)

    # Sketch18 → Cut-Extrude14 (cut)
    with BuildSketch(Plane.XY.offset(47)):
        with Locations((27.99744428, -4.816681728)):
            Circle(SKETCH18_R)
        with Locations((76.99744428, -4.816681728)):
            Circle(SKETCH18_R)
    extrude(amount=-CUT_EXTRUDE14_DEPTH, mode=Mode.SUBTRACT)

    # Fillet8
    # the kernel refuses this fillet: 3 mm, written as the material it adds along each edge
    with BuildSketch(Plane(origin=(22.99744428, 0, 35), x_dir=(-1, 0, 0), z_dir=(0, 0, 1))) as fillet8_piece_1:
        with BuildLine():
            CenterArc((FILLET8_R, FILLET8_R), FILLET8_R, 180, 90)
            Line((0, FILLET8_R), (0, 0))
            Line((0, 0), (FILLET8_R, 0))
        make_face()
    extrude(amount=12)
    with BuildSketch(Plane(origin=(31.99744428, 0, 35), x_dir=(0, 0, -1), z_dir=(-1, 0, 0))) as fillet8_piece_2:
        with BuildLine():
            CenterArc((FILLET8_R, FILLET8_R), FILLET8_R, 180, 90)
            Line((0, FILLET8_R), (0, 0))
            Line((0, 0), (FILLET8_R, 0))
        make_face()
    extrude(amount=9)
    with BuildSketch(Plane(origin=(22.99744428, 0, 27.5), x_dir=(-1, 0, 0), z_dir=(0, 0, 1))) as fillet8_piece_3a_section:
        with BuildLine():
            CenterArc((FILLET8_R, FILLET8_R), FILLET8_R, 180, 90)
            Line((0, FILLET8_R), (0, 0))
            Line((0, 0), (FILLET8_R, 0))
        make_face()
    fillet8_piece_3a = extrude(amount=19.5, mode=Mode.PRIVATE)
    fillet8_piece_3a = split(fillet8_piece_3a, bisect_by=Plane(origin=(22.99744428, 0, 35), z_dir=(0, 0, -1)), keep=Keep.TOP, mode=Mode.PRIVATE)
    with BuildSketch(Plane(origin=(31.99744428, 0, 35), x_dir=(0, 0, -1), z_dir=(-1, 0, 0))) as fillet8_piece_3b_section:
        with BuildLine():
            CenterArc((FILLET8_R, FILLET8_R), FILLET8_R, 180, 90)
            Line((0, FILLET8_R), (0, 0))
            Line((0, 0), (FILLET8_R, 0))
        make_face()
    fillet8_piece_3b = extrude(amount=16.5, mode=Mode.PRIVATE)
    fillet8_piece_3b = split(fillet8_piece_3b, bisect_by=Plane(origin=(22.99744428, 0, 35), z_dir=(-1, 0, 0)), keep=Keep.TOP, mode=Mode.PRIVATE)
    fillet8_piece_3 = fillet8_piece_3a & fillet8_piece_3b
    add(fillet8_piece_3)
    # the kernel refuses this fillet: 3 mm, written as the material it takes off along each edge
    with BuildSketch(Plane(origin=(22.99744428, -10, 27.5), x_dir=(1, 0, 0), z_dir=(0, 0, 1)), Plane(origin=(31.99744428, -10, 54.5), x_dir=(-1, 0, 0), z_dir=(0, 0, -1)), Plane(origin=(72.99744428, -10, 27.5), x_dir=(1, 0, 0), z_dir=(0, 0, 1)), Plane(origin=(81.99744428, -10, 54.5), x_dir=(-1, 0, 0), z_dir=(0, 0, -1))) as fillet8_2_piece_1:
        with BuildLine():
            CenterArc((FILLET8_R, FILLET8_R), FILLET8_R, 180, 90)
            Line((0, FILLET8_R), (0, 0))
            Line((0, 0), (FILLET8_R, 0))
        make_face()
    extrude(amount=27, mode=Mode.SUBTRACT)


solid = part.part
